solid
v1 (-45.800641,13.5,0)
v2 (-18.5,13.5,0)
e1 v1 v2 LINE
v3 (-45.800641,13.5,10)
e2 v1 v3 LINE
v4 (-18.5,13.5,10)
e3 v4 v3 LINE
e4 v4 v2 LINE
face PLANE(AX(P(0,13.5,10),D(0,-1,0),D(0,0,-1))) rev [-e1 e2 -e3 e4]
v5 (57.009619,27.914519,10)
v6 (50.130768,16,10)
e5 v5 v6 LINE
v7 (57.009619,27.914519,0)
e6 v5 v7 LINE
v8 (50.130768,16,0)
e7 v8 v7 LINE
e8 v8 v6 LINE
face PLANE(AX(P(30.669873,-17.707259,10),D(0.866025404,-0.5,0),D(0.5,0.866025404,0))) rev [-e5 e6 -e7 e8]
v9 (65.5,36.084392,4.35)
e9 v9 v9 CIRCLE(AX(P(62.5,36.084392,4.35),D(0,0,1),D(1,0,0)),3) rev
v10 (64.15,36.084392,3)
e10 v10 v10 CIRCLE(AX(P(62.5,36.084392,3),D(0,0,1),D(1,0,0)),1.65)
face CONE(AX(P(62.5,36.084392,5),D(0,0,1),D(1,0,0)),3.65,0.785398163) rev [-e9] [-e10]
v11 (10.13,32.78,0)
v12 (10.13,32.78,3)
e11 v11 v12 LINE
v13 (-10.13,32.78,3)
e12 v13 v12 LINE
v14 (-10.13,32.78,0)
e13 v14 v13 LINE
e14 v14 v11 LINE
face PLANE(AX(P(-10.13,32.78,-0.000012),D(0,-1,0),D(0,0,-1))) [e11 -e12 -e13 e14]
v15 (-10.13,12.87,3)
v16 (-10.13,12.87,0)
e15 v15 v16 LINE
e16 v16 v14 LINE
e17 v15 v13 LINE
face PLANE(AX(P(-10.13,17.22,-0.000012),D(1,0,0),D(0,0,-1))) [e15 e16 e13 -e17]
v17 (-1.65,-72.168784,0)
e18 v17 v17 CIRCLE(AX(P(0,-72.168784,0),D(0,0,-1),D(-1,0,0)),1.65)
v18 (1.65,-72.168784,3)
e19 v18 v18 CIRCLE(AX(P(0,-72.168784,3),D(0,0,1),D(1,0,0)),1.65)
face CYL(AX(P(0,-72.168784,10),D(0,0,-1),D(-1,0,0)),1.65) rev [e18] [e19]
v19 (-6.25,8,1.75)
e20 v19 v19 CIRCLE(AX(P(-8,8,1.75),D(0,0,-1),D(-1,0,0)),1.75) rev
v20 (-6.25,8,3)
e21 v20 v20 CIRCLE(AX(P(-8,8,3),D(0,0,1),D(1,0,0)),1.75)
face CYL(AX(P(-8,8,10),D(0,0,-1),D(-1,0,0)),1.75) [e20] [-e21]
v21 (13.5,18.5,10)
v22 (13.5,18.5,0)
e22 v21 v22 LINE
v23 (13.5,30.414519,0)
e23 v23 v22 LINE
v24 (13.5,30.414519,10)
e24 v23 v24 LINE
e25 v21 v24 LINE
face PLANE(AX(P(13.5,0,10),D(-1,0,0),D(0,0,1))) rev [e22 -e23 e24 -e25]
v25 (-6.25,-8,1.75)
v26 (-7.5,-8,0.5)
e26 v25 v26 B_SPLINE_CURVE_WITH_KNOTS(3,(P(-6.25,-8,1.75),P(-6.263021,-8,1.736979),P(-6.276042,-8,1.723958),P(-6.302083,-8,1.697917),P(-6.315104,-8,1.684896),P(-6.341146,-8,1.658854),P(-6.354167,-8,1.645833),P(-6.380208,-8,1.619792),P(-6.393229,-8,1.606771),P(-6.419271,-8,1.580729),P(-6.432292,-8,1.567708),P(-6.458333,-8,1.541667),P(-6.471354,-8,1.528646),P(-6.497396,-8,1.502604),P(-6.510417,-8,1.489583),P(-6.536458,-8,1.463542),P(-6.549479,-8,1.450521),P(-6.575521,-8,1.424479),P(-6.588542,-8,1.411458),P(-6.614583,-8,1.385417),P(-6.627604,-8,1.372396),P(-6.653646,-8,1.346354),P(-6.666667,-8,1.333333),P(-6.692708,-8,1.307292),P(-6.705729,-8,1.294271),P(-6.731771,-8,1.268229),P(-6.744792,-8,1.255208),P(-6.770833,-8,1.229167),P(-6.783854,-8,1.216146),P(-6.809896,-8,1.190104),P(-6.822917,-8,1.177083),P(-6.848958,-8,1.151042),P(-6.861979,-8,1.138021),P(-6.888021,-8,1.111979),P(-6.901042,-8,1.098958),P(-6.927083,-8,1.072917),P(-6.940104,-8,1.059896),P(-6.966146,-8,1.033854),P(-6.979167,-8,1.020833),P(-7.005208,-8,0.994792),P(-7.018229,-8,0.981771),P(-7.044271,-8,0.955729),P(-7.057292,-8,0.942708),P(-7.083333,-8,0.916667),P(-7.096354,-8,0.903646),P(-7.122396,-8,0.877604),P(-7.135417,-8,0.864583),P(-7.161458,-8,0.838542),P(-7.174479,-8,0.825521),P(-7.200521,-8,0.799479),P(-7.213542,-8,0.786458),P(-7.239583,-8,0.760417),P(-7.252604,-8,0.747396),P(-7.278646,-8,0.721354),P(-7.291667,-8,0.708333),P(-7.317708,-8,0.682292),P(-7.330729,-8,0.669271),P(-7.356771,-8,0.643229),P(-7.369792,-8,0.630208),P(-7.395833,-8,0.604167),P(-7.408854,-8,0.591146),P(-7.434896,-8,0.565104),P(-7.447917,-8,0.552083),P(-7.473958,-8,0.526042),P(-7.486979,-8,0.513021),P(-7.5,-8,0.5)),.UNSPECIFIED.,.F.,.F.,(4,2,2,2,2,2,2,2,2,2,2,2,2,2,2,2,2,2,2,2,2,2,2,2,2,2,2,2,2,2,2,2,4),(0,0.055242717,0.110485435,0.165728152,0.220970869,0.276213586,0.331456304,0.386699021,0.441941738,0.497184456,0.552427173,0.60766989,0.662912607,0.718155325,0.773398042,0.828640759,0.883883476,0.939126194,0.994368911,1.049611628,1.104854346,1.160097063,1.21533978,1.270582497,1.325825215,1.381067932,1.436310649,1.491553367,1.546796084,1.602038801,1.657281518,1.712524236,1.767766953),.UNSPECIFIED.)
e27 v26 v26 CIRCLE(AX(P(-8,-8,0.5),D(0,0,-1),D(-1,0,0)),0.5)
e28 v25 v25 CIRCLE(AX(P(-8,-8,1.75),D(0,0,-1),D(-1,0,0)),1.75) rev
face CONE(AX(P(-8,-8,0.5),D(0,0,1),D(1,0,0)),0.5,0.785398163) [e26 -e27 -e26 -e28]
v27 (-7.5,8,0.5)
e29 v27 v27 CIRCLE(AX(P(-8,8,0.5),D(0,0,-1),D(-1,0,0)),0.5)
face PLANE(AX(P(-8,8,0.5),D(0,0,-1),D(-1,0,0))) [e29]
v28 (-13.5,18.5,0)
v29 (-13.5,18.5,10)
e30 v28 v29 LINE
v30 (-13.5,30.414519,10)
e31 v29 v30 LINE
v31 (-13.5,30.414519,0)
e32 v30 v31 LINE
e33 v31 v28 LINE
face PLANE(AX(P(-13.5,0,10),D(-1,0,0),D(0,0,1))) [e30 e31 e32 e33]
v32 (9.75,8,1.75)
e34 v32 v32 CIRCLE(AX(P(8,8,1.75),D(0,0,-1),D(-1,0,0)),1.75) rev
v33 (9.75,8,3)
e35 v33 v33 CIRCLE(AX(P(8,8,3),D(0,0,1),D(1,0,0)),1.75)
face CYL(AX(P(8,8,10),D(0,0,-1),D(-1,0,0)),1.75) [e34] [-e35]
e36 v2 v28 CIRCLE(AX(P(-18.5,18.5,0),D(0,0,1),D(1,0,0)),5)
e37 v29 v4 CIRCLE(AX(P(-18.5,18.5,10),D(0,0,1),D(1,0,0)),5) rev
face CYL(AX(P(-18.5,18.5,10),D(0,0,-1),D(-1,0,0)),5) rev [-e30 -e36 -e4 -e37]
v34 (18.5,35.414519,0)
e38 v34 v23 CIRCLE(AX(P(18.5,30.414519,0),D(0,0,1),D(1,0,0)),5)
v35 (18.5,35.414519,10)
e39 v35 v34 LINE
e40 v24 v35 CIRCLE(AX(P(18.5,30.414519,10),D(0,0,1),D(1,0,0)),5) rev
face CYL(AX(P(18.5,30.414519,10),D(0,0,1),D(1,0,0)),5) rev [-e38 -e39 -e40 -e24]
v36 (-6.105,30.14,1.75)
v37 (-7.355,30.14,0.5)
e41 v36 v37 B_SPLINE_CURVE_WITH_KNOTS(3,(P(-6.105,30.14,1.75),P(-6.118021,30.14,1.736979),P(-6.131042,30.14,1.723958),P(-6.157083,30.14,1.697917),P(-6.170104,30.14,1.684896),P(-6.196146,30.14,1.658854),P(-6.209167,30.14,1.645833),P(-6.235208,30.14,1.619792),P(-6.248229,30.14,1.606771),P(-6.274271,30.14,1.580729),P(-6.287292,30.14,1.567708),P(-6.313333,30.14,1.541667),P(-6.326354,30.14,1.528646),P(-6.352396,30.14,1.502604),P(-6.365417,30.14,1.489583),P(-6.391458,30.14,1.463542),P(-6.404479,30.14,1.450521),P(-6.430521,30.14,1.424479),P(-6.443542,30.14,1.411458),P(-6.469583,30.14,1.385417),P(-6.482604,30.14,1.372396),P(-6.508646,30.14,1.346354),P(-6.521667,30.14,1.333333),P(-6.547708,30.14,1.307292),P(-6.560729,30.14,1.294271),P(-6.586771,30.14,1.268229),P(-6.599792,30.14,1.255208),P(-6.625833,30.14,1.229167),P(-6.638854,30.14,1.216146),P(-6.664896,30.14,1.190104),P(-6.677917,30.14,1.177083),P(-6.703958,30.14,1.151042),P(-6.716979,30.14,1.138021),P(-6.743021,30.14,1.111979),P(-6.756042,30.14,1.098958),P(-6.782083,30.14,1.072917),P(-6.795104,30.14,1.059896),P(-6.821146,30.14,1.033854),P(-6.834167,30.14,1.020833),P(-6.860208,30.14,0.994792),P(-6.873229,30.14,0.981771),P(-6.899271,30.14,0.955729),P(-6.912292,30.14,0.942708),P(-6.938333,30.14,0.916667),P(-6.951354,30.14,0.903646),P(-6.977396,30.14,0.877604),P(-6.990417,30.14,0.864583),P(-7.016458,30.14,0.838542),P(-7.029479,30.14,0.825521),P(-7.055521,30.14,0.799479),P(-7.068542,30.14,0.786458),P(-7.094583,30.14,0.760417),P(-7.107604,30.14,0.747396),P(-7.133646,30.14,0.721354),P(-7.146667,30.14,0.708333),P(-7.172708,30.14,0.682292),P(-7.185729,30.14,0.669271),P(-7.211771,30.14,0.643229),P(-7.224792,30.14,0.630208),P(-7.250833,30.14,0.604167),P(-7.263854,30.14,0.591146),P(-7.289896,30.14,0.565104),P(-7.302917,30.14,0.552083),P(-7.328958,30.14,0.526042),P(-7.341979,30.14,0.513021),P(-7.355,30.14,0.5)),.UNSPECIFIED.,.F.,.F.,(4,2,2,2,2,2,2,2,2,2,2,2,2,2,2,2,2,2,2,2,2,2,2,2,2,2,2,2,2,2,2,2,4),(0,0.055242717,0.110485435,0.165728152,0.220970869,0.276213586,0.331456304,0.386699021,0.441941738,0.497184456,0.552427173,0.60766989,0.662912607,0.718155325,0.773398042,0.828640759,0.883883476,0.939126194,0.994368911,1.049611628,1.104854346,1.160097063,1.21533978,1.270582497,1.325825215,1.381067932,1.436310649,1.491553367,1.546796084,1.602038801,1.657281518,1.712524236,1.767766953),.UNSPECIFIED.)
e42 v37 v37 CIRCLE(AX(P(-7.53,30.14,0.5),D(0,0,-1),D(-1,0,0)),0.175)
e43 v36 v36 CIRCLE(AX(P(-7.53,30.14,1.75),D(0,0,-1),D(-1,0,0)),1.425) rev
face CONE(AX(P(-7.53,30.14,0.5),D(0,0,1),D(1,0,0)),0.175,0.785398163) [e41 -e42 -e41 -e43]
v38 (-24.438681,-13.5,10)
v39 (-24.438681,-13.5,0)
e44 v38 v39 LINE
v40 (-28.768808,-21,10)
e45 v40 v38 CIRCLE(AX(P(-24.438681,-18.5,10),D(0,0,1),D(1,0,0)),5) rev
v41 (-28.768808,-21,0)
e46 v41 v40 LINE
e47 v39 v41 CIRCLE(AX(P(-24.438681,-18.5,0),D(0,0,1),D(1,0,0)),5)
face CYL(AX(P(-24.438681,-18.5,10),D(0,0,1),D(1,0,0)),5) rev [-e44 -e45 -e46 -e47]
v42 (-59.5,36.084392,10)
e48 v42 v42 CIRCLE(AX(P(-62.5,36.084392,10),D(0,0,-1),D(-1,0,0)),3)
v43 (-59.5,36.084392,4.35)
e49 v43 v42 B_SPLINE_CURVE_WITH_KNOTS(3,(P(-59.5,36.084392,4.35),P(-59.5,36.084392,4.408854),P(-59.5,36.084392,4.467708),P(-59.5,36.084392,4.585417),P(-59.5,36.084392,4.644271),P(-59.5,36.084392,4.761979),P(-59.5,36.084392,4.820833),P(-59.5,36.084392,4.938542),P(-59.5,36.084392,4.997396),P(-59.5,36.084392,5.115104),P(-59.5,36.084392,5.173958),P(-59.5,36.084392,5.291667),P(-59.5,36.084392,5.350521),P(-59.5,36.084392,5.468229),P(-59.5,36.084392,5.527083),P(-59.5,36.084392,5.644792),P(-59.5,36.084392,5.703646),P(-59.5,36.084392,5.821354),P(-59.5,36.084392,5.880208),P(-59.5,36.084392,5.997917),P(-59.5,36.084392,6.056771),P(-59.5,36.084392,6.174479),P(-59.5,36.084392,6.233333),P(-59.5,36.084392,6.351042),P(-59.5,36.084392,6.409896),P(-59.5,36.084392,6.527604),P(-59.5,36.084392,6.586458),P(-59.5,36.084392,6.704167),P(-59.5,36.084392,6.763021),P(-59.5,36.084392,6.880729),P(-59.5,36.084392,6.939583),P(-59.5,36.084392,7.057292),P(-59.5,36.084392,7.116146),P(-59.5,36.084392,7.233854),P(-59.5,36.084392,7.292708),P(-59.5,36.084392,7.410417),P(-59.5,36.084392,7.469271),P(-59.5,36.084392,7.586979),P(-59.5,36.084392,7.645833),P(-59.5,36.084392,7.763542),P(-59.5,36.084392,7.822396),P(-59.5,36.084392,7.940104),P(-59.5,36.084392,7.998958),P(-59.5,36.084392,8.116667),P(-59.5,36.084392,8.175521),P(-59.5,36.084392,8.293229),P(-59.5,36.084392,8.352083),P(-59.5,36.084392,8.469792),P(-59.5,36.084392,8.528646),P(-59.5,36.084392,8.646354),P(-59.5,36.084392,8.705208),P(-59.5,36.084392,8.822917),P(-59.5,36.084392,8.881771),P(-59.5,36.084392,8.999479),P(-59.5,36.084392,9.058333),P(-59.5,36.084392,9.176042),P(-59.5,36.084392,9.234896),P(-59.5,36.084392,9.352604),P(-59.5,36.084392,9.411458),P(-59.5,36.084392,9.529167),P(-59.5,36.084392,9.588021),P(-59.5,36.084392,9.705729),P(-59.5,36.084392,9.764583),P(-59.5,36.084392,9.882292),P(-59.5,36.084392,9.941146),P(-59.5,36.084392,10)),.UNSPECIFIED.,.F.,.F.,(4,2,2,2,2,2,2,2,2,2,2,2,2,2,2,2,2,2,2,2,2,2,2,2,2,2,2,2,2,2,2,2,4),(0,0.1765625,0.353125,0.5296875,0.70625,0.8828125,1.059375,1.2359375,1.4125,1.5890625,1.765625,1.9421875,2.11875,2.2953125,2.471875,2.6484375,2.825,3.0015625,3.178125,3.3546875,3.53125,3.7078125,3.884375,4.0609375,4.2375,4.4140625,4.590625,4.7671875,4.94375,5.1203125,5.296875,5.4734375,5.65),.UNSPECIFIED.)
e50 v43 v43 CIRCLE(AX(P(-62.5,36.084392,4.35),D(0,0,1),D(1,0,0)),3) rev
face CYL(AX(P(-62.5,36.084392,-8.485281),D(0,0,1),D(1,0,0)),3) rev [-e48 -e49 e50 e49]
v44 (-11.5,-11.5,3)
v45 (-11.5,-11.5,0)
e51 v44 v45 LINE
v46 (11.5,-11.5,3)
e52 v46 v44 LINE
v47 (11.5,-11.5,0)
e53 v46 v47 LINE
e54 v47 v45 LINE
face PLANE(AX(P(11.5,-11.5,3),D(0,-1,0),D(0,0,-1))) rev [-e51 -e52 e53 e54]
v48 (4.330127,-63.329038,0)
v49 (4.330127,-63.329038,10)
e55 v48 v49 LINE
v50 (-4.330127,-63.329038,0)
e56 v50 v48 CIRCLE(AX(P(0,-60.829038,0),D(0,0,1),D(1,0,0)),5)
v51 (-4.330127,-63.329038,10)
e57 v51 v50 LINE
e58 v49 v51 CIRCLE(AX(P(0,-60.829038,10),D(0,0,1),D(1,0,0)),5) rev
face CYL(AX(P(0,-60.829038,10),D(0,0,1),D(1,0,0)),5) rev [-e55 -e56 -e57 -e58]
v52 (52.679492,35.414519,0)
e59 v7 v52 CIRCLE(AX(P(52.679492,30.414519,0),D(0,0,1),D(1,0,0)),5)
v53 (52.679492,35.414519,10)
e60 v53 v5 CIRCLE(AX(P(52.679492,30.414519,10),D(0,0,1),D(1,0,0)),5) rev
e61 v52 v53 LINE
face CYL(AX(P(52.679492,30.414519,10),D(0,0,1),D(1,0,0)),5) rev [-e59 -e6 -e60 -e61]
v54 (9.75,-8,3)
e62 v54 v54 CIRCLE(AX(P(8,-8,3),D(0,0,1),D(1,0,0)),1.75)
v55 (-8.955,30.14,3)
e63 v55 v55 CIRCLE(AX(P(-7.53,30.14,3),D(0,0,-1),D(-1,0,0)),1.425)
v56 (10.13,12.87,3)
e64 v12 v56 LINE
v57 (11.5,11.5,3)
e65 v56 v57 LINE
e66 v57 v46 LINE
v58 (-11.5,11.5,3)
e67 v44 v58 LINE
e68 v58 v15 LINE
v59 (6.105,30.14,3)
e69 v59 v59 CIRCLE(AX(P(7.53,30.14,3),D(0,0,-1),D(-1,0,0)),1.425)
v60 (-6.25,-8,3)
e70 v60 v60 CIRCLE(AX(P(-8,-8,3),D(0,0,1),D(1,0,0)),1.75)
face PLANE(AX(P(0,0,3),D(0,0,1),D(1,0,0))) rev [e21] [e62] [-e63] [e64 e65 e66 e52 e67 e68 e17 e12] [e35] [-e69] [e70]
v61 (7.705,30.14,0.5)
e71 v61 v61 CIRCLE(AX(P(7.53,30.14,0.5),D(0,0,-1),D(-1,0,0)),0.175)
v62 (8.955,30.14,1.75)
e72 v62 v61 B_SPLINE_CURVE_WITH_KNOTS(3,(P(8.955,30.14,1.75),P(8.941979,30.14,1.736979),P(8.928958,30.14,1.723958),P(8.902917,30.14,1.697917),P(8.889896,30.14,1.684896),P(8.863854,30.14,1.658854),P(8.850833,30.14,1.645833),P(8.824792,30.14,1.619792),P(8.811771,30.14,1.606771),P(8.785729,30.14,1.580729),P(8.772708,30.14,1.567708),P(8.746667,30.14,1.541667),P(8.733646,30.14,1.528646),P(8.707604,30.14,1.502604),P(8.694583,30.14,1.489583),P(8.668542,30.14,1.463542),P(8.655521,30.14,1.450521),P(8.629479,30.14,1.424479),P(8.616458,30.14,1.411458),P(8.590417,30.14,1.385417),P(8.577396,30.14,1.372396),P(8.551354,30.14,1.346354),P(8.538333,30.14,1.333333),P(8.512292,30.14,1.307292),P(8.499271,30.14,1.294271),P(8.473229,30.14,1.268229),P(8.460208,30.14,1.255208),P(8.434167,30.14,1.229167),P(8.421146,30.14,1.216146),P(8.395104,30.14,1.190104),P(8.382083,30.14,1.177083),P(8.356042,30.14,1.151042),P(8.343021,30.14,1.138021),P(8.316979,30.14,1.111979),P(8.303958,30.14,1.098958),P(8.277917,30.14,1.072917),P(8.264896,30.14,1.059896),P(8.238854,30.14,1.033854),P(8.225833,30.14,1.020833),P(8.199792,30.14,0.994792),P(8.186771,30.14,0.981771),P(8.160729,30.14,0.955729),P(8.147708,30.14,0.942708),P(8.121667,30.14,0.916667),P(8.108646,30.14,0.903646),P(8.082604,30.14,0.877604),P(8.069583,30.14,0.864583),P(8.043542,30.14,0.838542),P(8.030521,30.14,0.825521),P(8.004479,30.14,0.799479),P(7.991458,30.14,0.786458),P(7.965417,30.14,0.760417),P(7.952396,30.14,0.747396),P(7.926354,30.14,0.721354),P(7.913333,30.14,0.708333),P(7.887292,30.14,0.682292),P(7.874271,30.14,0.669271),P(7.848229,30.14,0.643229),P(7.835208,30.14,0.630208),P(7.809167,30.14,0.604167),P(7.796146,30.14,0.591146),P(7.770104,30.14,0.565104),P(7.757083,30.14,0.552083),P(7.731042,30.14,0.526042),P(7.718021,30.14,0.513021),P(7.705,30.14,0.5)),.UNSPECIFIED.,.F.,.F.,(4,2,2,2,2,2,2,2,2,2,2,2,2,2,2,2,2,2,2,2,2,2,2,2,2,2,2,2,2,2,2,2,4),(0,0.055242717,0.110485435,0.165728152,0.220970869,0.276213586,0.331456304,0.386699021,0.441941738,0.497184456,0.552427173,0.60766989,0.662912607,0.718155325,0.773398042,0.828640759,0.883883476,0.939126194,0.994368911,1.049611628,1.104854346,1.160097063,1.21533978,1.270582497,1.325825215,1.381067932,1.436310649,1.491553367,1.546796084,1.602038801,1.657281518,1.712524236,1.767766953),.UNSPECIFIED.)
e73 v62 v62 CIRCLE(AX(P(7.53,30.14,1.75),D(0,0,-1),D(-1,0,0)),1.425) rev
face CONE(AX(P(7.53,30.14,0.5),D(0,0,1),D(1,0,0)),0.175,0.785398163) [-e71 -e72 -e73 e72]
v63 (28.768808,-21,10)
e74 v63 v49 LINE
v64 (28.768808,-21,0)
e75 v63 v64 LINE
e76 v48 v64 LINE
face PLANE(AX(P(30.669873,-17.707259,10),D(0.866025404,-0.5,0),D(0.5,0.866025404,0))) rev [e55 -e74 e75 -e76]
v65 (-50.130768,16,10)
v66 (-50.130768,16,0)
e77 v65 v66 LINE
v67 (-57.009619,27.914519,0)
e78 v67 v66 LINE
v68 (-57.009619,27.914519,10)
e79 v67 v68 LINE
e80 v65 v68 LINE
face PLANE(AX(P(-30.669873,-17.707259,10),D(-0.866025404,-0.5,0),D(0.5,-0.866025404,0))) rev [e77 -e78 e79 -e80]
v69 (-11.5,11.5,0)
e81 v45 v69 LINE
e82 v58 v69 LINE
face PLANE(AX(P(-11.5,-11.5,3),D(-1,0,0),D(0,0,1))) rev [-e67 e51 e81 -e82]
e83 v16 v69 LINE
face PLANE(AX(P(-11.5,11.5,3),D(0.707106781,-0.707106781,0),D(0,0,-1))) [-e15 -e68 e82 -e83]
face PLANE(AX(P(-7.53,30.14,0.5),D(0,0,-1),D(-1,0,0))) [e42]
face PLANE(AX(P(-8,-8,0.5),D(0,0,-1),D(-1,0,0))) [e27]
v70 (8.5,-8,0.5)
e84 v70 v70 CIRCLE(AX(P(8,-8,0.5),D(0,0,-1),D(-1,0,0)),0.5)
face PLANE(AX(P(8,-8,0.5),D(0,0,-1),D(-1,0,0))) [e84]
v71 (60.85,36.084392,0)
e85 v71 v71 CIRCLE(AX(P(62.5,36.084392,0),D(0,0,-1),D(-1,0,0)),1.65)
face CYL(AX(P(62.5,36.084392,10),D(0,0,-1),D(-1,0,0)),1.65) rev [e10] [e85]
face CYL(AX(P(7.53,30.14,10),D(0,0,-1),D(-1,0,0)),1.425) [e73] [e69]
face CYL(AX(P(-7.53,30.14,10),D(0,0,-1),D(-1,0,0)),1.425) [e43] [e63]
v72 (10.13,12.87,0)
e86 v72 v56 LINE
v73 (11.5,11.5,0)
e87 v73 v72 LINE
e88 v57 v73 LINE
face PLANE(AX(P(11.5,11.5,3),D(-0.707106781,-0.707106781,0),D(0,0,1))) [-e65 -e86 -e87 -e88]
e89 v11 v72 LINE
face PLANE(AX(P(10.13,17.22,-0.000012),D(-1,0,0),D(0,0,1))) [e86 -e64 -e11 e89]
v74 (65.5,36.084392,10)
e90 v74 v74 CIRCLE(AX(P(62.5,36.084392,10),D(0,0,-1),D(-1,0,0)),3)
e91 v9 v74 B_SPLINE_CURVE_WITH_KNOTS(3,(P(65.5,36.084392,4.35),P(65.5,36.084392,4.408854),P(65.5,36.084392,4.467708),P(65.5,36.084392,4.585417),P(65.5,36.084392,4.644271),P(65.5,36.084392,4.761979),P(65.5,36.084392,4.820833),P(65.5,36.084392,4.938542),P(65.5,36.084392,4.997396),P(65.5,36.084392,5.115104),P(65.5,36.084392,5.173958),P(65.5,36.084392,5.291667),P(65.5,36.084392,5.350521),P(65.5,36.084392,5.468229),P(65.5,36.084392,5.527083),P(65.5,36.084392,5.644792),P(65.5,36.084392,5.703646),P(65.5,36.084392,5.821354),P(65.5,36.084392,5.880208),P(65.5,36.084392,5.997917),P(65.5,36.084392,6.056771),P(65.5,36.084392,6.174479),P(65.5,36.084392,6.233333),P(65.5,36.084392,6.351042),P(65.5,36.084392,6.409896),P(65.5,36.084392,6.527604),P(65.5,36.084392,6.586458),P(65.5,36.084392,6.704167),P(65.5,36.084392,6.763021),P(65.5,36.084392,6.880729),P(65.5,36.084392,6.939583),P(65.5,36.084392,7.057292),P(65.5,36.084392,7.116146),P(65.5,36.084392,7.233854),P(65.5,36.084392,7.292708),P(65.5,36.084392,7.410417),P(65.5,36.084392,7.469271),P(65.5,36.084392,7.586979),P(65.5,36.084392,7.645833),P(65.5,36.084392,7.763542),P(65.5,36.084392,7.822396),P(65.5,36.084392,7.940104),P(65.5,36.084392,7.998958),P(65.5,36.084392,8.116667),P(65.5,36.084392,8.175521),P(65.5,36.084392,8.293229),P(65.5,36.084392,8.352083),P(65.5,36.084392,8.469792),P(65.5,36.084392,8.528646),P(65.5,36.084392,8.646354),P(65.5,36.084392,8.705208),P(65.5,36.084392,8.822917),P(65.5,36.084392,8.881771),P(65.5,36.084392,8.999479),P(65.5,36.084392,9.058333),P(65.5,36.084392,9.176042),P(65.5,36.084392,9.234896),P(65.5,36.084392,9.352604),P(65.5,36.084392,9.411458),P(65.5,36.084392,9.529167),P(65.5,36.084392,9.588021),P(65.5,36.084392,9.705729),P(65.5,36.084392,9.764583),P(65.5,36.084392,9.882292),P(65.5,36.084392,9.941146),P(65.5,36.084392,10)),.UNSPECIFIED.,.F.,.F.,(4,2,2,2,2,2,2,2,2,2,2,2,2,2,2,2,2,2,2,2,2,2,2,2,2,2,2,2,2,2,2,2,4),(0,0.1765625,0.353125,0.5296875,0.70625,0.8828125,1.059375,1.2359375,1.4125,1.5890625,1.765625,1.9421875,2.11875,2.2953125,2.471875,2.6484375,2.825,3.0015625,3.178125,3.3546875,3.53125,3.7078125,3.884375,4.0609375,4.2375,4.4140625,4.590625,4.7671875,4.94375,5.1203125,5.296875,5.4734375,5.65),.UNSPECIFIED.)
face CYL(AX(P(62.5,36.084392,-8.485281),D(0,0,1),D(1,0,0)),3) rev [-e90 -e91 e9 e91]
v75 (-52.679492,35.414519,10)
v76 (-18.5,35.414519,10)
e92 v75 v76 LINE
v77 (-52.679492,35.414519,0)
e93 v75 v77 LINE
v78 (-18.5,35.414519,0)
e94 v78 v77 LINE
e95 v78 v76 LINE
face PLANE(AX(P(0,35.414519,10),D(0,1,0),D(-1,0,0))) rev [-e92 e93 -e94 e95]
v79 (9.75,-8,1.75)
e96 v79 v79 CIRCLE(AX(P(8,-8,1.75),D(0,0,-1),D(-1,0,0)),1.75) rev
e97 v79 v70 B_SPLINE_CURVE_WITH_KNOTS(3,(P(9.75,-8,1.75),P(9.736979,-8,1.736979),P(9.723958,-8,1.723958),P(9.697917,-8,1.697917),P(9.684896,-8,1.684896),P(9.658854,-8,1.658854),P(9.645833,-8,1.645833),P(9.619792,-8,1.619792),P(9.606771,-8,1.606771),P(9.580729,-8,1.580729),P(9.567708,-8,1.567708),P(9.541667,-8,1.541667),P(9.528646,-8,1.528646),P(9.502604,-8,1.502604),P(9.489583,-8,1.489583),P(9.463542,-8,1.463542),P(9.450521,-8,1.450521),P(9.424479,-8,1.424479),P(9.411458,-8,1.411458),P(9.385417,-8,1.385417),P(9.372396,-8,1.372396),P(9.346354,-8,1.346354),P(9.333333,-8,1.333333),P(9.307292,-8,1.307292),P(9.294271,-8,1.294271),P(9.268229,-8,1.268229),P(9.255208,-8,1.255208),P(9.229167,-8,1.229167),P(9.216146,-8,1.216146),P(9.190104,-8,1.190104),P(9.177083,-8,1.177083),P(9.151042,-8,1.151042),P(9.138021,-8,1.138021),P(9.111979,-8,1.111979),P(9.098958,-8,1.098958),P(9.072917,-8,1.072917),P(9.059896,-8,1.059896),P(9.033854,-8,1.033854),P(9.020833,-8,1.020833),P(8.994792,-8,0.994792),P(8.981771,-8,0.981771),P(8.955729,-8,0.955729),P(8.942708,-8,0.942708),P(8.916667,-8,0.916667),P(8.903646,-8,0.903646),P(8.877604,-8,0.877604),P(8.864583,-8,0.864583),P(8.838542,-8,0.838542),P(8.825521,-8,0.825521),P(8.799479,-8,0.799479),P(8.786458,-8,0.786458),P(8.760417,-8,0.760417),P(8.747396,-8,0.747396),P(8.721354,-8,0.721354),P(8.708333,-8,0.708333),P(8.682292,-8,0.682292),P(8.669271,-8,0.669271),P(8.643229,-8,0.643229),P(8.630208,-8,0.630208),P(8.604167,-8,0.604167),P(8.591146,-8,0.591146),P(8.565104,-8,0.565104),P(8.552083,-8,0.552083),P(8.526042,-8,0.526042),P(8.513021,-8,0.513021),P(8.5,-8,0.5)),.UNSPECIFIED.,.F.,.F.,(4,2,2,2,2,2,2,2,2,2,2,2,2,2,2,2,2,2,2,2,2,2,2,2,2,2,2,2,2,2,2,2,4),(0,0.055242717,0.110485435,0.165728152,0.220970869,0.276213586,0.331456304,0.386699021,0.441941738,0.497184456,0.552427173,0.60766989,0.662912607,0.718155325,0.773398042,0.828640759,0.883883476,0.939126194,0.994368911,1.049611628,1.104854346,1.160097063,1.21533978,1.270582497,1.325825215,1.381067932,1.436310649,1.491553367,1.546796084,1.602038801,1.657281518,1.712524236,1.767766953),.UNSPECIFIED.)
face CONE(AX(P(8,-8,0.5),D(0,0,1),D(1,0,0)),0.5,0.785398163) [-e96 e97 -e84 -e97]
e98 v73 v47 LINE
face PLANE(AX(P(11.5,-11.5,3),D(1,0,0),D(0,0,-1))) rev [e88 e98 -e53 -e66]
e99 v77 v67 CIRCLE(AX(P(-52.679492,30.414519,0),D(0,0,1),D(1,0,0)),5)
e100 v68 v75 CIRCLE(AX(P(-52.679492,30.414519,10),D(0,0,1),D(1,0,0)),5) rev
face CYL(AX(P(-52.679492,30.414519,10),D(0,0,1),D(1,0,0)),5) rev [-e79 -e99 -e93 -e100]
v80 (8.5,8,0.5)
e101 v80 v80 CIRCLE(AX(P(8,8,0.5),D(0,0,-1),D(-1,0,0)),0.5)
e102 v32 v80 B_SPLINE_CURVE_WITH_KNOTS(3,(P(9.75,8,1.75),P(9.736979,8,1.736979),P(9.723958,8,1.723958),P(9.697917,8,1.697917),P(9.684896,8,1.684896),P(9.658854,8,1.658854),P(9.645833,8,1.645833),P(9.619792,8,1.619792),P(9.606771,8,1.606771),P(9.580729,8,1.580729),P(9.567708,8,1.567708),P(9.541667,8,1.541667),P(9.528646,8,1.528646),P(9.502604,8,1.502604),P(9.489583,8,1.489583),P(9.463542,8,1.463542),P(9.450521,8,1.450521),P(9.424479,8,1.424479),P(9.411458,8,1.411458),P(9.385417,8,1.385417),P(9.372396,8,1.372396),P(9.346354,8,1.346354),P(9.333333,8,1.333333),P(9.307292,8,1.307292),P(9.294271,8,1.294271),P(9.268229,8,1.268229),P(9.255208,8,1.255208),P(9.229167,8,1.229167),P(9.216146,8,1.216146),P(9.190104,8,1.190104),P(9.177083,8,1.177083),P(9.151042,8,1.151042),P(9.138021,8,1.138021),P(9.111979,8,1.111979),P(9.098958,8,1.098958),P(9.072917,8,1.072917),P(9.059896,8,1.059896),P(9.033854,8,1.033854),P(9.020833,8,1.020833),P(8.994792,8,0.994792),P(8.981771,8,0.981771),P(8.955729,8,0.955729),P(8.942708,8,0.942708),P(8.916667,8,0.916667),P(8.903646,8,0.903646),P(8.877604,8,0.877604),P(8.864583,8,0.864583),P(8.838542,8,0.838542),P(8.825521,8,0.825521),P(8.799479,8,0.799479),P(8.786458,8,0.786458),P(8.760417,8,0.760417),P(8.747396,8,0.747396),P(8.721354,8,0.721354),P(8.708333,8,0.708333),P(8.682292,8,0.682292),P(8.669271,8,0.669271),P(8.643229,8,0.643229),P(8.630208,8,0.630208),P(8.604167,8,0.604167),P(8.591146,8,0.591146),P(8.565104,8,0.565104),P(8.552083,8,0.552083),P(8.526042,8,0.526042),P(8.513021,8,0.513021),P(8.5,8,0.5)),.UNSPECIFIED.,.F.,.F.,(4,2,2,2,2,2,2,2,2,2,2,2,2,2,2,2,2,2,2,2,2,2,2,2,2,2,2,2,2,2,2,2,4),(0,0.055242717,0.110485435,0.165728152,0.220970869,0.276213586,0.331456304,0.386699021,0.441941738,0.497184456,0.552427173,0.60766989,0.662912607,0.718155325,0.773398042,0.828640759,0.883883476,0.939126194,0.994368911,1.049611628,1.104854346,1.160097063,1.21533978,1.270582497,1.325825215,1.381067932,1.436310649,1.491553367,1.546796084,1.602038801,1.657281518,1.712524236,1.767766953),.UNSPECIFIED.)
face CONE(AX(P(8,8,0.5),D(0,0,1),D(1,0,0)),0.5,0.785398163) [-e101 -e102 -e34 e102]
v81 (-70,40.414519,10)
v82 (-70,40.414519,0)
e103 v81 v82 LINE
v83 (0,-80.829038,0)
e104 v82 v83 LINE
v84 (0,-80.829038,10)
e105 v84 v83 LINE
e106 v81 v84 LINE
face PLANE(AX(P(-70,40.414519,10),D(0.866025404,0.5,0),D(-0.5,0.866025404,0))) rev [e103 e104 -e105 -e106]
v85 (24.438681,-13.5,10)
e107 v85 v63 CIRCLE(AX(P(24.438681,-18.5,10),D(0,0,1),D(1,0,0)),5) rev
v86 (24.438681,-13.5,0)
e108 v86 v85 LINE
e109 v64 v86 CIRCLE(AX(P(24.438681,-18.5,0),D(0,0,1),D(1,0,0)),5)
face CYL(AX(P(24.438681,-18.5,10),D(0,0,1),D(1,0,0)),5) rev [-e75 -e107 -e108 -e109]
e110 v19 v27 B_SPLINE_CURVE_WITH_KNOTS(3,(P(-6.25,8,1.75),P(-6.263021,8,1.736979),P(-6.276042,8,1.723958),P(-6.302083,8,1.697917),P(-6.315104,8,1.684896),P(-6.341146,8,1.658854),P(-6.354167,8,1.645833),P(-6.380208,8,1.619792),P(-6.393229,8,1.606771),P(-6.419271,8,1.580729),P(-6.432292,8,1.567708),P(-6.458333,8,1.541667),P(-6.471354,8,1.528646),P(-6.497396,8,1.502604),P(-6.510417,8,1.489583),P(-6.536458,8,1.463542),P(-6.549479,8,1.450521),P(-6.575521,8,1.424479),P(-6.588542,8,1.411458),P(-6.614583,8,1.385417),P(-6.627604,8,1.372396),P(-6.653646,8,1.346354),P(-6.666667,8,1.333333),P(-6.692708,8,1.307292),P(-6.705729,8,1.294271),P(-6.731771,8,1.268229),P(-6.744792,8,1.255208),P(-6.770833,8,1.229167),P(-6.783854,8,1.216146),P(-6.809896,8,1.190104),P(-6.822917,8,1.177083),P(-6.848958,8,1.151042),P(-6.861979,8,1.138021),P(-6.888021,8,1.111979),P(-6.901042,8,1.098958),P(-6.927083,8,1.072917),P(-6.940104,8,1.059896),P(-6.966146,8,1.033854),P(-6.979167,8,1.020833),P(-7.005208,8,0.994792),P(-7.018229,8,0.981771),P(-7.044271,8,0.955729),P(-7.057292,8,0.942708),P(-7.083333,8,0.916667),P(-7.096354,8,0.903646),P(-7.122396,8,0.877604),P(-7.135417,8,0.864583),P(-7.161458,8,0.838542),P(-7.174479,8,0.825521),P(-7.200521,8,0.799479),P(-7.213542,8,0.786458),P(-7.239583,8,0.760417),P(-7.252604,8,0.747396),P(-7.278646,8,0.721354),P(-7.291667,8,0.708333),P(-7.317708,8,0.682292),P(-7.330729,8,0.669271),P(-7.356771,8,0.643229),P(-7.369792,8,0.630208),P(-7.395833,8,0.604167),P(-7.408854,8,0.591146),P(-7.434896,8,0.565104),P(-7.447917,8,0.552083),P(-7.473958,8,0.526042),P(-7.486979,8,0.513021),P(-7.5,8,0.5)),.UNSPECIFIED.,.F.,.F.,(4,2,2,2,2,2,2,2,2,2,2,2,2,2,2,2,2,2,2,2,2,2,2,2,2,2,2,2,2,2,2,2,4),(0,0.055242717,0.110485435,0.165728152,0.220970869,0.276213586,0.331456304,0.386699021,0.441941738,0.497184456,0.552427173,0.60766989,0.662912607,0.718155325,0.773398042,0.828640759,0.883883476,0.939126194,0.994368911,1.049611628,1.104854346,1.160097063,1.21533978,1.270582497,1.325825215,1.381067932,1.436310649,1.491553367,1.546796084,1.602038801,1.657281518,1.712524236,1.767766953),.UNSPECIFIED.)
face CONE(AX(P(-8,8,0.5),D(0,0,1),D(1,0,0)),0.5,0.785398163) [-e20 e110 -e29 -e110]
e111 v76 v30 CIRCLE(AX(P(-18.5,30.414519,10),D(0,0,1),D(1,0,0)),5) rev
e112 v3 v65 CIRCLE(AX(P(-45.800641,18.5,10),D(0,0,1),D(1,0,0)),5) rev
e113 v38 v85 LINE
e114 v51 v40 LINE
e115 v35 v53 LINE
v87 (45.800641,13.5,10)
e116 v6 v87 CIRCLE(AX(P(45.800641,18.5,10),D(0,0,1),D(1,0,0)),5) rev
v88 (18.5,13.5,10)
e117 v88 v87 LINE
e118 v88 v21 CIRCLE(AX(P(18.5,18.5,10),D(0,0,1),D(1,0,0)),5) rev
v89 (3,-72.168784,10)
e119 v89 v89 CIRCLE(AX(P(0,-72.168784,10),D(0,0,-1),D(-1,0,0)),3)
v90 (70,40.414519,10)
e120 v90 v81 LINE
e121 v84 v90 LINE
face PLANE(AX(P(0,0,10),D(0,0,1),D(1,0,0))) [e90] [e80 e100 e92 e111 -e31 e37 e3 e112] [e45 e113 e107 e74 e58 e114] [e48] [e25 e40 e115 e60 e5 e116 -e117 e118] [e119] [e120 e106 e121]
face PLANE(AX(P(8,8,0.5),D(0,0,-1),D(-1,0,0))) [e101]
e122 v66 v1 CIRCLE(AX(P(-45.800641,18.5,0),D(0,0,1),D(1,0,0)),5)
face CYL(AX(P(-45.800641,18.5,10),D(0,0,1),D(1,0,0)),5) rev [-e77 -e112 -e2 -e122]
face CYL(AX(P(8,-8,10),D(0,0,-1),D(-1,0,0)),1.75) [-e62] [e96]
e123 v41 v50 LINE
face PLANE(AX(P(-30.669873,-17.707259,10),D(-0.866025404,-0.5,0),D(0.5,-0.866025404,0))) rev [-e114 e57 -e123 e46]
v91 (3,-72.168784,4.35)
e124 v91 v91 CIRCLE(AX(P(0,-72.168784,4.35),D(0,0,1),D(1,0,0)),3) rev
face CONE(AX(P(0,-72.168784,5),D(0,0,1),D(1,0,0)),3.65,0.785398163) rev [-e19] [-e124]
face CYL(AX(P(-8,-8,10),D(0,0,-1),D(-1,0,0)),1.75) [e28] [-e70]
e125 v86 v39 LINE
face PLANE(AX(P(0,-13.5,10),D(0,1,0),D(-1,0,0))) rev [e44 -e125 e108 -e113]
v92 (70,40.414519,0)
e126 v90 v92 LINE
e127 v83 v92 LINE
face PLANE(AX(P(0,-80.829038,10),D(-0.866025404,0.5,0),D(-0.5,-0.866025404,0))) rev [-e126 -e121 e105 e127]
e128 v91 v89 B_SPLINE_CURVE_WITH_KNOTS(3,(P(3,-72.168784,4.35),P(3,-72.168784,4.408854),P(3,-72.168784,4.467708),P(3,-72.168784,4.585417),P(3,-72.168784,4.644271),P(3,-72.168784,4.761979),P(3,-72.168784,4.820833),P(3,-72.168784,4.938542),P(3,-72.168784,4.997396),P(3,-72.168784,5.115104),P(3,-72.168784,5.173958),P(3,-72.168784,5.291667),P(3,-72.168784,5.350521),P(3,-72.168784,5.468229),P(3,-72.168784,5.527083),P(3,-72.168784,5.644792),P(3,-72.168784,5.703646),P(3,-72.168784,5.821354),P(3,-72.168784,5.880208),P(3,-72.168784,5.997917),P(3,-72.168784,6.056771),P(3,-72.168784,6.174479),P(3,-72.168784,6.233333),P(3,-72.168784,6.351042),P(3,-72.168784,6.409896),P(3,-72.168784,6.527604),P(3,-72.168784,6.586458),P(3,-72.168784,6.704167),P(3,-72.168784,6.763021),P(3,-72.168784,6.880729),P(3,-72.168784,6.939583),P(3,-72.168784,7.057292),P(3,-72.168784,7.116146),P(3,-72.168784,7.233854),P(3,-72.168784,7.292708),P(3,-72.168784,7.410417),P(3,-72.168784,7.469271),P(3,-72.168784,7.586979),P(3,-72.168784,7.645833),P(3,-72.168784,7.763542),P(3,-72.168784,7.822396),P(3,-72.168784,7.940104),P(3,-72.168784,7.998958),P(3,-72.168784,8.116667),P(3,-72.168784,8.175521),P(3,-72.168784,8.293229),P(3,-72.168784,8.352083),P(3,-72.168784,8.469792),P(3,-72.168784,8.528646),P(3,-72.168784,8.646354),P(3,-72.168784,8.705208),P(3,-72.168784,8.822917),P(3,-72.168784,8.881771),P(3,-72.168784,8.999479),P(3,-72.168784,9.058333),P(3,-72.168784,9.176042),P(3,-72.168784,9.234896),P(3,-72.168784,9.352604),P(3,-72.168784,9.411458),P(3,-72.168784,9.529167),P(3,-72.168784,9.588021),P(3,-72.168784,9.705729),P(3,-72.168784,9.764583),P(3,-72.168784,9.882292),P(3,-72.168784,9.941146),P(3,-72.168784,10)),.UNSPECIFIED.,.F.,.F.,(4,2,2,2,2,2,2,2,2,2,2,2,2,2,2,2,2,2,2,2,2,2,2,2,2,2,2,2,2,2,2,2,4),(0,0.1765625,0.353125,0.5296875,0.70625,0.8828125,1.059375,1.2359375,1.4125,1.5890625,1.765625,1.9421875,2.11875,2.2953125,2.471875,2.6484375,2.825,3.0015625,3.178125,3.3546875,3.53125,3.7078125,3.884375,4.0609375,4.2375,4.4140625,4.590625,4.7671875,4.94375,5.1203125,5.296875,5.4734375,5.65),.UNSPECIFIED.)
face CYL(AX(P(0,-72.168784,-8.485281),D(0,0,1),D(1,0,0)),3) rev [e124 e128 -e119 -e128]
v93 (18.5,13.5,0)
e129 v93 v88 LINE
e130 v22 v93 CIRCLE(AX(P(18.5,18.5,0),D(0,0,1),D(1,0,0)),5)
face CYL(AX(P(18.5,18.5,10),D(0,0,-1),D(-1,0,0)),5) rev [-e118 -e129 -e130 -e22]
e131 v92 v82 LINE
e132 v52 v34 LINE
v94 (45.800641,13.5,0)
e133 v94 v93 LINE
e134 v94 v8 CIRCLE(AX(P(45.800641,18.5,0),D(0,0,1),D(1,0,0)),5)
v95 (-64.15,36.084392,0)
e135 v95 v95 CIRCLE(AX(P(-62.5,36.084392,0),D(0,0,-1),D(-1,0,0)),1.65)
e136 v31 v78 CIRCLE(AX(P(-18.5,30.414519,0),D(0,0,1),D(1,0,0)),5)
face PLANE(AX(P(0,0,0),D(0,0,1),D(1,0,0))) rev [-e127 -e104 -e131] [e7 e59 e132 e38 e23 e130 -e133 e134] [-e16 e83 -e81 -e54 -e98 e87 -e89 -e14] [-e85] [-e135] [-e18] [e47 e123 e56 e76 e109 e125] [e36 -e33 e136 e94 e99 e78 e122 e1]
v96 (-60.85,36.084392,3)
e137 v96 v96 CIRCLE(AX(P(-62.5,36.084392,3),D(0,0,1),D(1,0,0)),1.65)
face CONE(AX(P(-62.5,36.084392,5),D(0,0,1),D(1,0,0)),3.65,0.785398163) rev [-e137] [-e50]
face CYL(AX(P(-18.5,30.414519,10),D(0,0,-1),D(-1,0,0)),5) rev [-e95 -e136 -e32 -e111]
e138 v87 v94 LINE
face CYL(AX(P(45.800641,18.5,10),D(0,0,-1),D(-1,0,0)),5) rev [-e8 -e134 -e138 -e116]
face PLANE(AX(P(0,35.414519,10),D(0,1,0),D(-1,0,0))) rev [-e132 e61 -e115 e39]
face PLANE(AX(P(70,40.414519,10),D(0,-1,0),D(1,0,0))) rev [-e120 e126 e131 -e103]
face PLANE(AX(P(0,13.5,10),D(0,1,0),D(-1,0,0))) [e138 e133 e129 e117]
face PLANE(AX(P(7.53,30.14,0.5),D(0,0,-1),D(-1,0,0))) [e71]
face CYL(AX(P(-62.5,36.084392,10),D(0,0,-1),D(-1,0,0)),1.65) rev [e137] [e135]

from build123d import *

# Parameters (mm, degrees)
BOSS_EXTRUDE1_DEPTH      = 10
SKETCH2_W                = 23
SKETCH2_H                = 23
CUT_EXTRUDE1_DEPTH       = 3
CUT_EXTRUDE2_DEPTH       = 108.15565003
CUT_EXTRUDE2_DEPTH_BACK  = 108.15565003
SKETCH3_R                = 1.5
CUT_EXTRUDE3_DEPTH       = 108.393357957
CUT_EXTRUDE3_DEPTH_BACK  = 3
SKETCH4_W                = 20.26
SKETCH4_H                = 15.56
CUT_EXTRUDE4_DEPTH       = 108.15565003
CUT_EXTRUDE4_DEPTH_BACK  = 108.15565003
SKETCH5_R                = 1.425
CUT_EXTRUDE6_DEPTH       = 108.393357957
CUT_EXTRUDE6_DEPTH_BACK  = 108.393357957
FILLET1_R                = 5
SKETCH8_W                = 20.26
SKETCH8_H                = 3
CUT_EXTRUDE8_DEPTH       = 28.72
CHAMFER1_SIZE            = 1.37
SKETCH9_R                = 1.65
CUT_EXTRUDE9_DEPTH       = 108.393357957
SKETCH10_R               = 3
CUT_EXTRUDE10_DEPTH      = 5
BOSS_EXTRUDE2_DEPTH      = 2.5
BOSS_EXTRUDE2_DEPTH_BACK = 7
SKETCH12_R               = 1.75
SKETCH12_R_2             = 1.425
CHAMFER2_SIZE            = 2
CHAMFER3_SIZE            = 1.25


# Some blends are built 0.0001 mm under size
with BuildPart() as part:
    # Sketch1 → Boss-Extrude1 (new body)
    with BuildSketch(Plane.XY):
        Polygon((0, -80.829037687), (70, 40.414518843), (-70, 40.414518843), align=None)
    extrude(amount=BOSS_EXTRUDE1_DEPTH)

    # Sketch2 → Cut-Extrude1 (cut)
    with BuildSketch(Plane(origin=(0, 0, 0), x_dir=(-1, 0, 0), z_dir=(0, 0, -1))):
        Rectangle(SKETCH2_W, SKETCH2_H)
    extrude(amount=-CUT_EXTRUDE1_DEPTH, mode=Mode.SUBTRACT)

    # Sketch3 → Cut-Extrude2 (cut, two sides: drawn at the far end of the back side and taken through both)
    with BuildSketch(Plane(origin=(0, 0, 3), x_dir=(-1, 0, 0), z_dir=(0, 0, -1)).offset(-CUT_EXTRUDE2_DEPTH_BACK)):
        with Locations((-8, 8)):
            Circle(SKETCH3_R)
        with Locations((8, 8)):
            Circle(SKETCH3_R)
        with Locations((8, -8)):
            Circle(SKETCH3_R)
        with Locations((-8, -8)):
            Circle(SKETCH3_R)
    extrude(amount=CUT_EXTRUDE2_DEPTH + CUT_EXTRUDE2_DEPTH_BACK, mode=Mode.SUBTRACT)

    # Sketch4 → Cut-Extrude3 (cut, two sides: drawn at the far end of the back side and taken through both)
    with BuildSketch(Plane(origin=(0, 0, 0), x_dir=(-1, 0, 0), z_dir=(0, 0, -1)).offset(-CUT_EXTRUDE3_DEPTH_BACK)):
        with Locations((0, 25)):
            Rectangle(SKETCH4_W, SKETCH4_H)
    extrude(amount=CUT_EXTRUDE3_DEPTH + CUT_EXTRUDE3_DEPTH_BACK, mode=Mode.SUBTRACT)

    # Sketch5 → Cut-Extrude4 (cut, two sides: drawn at the far end of the back side and taken through both)
    with BuildSketch(Plane(origin=(0, 0, 3), x_dir=(-1, 0, 0), z_dir=(0, 0, -1)).offset(-CUT_EXTRUDE4_DEPTH_BACK)):
        with Locations((-7.53, 30.14)):
            Circle(SKETCH5_R)
        with Locations((7.53, 30.14)):
            Circle(SKETCH5_R)
    extrude(amount=CUT_EXTRUDE4_DEPTH + CUT_EXTRUDE4_DEPTH_BACK, mode=Mode.SUBTRACT)

    # Sketch6 → Cut-Extrude6 (cut, two sides: drawn at the far end of the back side and taken through both)
    with BuildSketch(Plane(origin=(0, 0, 0), x_dir=(-1, 0, 0), z_dir=(0, 0, -1)).offset(-CUT_EXTRUDE6_DEPTH_BACK)):
        Polygon((-13.5, 13.5), (-13.5, 35.414518843), (-61.339745962, 35.414518843), (-48.687392609, 13.5), align=None)
        Polygon((13.5, 13.5), (48.687392609, 13.5), (61.339745962, 35.414518843), (13.5, 35.414518843), align=None)
        Polygon((-13.5, -13.5), (-33.098935341, -13.5), (0, -70.829037687), (33.098935341, -13.5), (13.5, -13.5), align=None)
    extrude(amount=CUT_EXTRUDE6_DEPTH + CUT_EXTRUDE6_DEPTH_BACK, mode=Mode.SUBTRACT)

    # Fillet1
    fillet1_edges = [part.edges().sort_by_distance(p)[0] for p in [
        (13.5, 35.414518843, 5),
        (13.5, 13.5, 5),
        (48.687392609, 13.5, 5),
        (61.339745962, 35.414518843, 5),
        (33.098935341, -13.5, 5),
        (-33.098935341, -13.5, 5),
        (0, -70.829037687, 5),
        (-48.687392609, 13.5, 5),
        (-13.5, 13.5, 5),
        (-13.5, 35.414518843, 5),
        (-61.339745962, 35.414518843, 5),
    ]]
    fillet(fillet1_edges, radius=FILLET1_R)

    # Sketch8 → Cut-Extrude8 (cut)
    with BuildSketch(Plane(origin=(0, 17.22, 0), x_dir=(1, 0, 0), z_dir=(0, 1, 0))):
        with Locations((0, -1.5)):
            Rectangle(SKETCH8_W, SKETCH8_H)
    extrude(amount=-CUT_EXTRUDE8_DEPTH, mode=Mode.SUBTRACT)

    # Chamfer1
    chamfer1_edges = [part.edges().sort_by_distance(p)[0] for p in [
        (10.13, 11.5, 1.5),
        (-10.13, 11.5, 1.5),
    ]]
    chamfer(chamfer1_edges, length=CHAMFER1_SIZE - 0.0001)  # a hair under: the kernel refuses the full size

    # Sketch9 → Cut-Extrude9 (cut, through all)
    with BuildSketch(Plane(origin=(0, 0, 0), x_dir=(-1, 0, 0), z_dir=(0, 0, -1))):
        with Locations((-62.5, 36.084391824)):
            Circle(SKETCH9_R)
        with Locations((62.5, 36.084391824)):
            Circle(SKETCH9_R)
        with Locations((0, -72.168783649)):
            Circle(SKETCH9_R)
    extrude(amount=-CUT_EXTRUDE9_DEPTH, mode=Mode.SUBTRACT)

    # Sketch10 → Cut-Extrude10 (cut)
    with BuildSketch(Plane(origin=(0, 0, 10), x_dir=(-1, 0, 0), z_dir=(0, 0, -1))):
        with Locations(Location((-62.5, 36.084391824, 0), (0, 0, 180))):
            Circle(SKETCH10_R)
        with Locations(Location((62.5, 36.084391824, 0), (0, 0, 180))):
            Circle(SKETCH10_R)
        with Locations(Location((0, -72.168783649, 0), (0, 0, 180))):
            Circle(SKETCH10_R)
    extrude(amount=CUT_EXTRUDE10_DEPTH, mode=Mode.SUBTRACT)

    # Sketch12 → Boss-Extrude2 (add, two sides: drawn at the far end of the back side and taken through both)
    with BuildSketch(Plane(origin=(0, 0, 3), x_dir=(-1, 0, 0), z_dir=(0, 0, -1)).offset(-BOSS_EXTRUDE2_DEPTH_BACK)):
        with Locations((-8, 8)):
            Circle(SKETCH12_R)
        with Locations((8, 8)):
            Circle(SKETCH12_R)
        with Locations((8, -8)):
            Circle(SKETCH12_R)
        with Locations((-8, -8)):
            Circle(SKETCH12_R)
        with Locations((-7.53, 30.14)):
            Circle(SKETCH12_R_2)
        with Locations((7.53, 30.14)):
            Circle(SKETCH12_R_2)
    extrude(amount=BOSS_EXTRUDE2_DEPTH + BOSS_EXTRUDE2_DEPTH_BACK)

    # Chamfer2
    # the kernel refuses this chamfer: 2 mm, written as the material it takes off along each edge
    with BuildSketch(Plane(origin=(62.5, 36.084391824, 5), x_dir=(-1, 0, 0), z_dir=(0, -1, 0))) as chamfer2_piece_1_section:
        Polygon((1.65, CHAMFER2_SIZE), (1.65 + CHAMFER2_SIZE, 0), (1.65, 0), align=None)
    chamfer2_piece_1 = revolve(axis=Axis((62.5, 36.084391824, 5), (0, 0, -1)), mode=Mode.PRIVATE)
    chamfer2_piece_1 = chamfer2_piece_1 & Plane(origin=(62.5, 36.084391824, 3.667830139), x_dir=(1, 0, 0), z_dir=(0, 0, 1)) * Cylinder(3, 15, mode=Mode.PRIVATE)
    add(chamfer2_piece_1, mode=Mode.SUBTRACT)
    with BuildSketch(Plane(origin=(-62.5, 36.084391824, 5), x_dir=(-1, 0, 0), z_dir=(0, -1, 0))) as chamfer2_piece_2_section:
        Polygon((1.65, CHAMFER2_SIZE), (1.65 + CHAMFER2_SIZE, 0), (1.65, 0), align=None)
    chamfer2_piece_2 = revolve(axis=Axis((-62.5, 36.084391824, 5), (0, 0, -1)), mode=Mode.PRIVATE)
    chamfer2_piece_2 = chamfer2_piece_2 & Plane(origin=(-62.5, 36.084391824, 3.667830139), x_dir=(1, 0, 0), z_dir=(0, 0, 1)) * Cylinder(3, 15, mode=Mode.PRIVATE)
    add(chamfer2_piece_2, mode=Mode.SUBTRACT)
    with BuildSketch(Plane(origin=(0, -72.168783649, 5), x_dir=(-1, 0, 0), z_dir=(0, -1, 0))) as chamfer2_piece_3_section:
        Polygon((1.65, CHAMFER2_SIZE), (1.65 + CHAMFER2_SIZE, 0), (1.65, 0), align=None)
    chamfer2_piece_3 = revolve(axis=Axis((0, -72.168783649, 5), (0, 0, -1)), mode=Mode.PRIVATE)
    chamfer2_piece_3 = chamfer2_piece_3 & Plane(origin=(0, -72.168783649, 3.667830139), x_dir=(1, 0, 0), z_dir=(0, 0, 1)) * Cylinder(3, 15, mode=Mode.PRIVATE)
    add(chamfer2_piece_3, mode=Mode.SUBTRACT)

    # Chamfer3
    chamfer3_edges = [part.edges().sort_by_distance(p)[0] for p in [
        (9.75, 8, 0.5),
        (-6.25, 8, 0.5),
        (-6.25, -8, 0.5),
        (9.75, -8, 0.5),
        (8.955, 30.14, 0.5),
        (-6.105, 30.14, 0.5),
    ]]
    chamfer(chamfer3_edges, length=CHAMFER3_SIZE)


solid = part.part
